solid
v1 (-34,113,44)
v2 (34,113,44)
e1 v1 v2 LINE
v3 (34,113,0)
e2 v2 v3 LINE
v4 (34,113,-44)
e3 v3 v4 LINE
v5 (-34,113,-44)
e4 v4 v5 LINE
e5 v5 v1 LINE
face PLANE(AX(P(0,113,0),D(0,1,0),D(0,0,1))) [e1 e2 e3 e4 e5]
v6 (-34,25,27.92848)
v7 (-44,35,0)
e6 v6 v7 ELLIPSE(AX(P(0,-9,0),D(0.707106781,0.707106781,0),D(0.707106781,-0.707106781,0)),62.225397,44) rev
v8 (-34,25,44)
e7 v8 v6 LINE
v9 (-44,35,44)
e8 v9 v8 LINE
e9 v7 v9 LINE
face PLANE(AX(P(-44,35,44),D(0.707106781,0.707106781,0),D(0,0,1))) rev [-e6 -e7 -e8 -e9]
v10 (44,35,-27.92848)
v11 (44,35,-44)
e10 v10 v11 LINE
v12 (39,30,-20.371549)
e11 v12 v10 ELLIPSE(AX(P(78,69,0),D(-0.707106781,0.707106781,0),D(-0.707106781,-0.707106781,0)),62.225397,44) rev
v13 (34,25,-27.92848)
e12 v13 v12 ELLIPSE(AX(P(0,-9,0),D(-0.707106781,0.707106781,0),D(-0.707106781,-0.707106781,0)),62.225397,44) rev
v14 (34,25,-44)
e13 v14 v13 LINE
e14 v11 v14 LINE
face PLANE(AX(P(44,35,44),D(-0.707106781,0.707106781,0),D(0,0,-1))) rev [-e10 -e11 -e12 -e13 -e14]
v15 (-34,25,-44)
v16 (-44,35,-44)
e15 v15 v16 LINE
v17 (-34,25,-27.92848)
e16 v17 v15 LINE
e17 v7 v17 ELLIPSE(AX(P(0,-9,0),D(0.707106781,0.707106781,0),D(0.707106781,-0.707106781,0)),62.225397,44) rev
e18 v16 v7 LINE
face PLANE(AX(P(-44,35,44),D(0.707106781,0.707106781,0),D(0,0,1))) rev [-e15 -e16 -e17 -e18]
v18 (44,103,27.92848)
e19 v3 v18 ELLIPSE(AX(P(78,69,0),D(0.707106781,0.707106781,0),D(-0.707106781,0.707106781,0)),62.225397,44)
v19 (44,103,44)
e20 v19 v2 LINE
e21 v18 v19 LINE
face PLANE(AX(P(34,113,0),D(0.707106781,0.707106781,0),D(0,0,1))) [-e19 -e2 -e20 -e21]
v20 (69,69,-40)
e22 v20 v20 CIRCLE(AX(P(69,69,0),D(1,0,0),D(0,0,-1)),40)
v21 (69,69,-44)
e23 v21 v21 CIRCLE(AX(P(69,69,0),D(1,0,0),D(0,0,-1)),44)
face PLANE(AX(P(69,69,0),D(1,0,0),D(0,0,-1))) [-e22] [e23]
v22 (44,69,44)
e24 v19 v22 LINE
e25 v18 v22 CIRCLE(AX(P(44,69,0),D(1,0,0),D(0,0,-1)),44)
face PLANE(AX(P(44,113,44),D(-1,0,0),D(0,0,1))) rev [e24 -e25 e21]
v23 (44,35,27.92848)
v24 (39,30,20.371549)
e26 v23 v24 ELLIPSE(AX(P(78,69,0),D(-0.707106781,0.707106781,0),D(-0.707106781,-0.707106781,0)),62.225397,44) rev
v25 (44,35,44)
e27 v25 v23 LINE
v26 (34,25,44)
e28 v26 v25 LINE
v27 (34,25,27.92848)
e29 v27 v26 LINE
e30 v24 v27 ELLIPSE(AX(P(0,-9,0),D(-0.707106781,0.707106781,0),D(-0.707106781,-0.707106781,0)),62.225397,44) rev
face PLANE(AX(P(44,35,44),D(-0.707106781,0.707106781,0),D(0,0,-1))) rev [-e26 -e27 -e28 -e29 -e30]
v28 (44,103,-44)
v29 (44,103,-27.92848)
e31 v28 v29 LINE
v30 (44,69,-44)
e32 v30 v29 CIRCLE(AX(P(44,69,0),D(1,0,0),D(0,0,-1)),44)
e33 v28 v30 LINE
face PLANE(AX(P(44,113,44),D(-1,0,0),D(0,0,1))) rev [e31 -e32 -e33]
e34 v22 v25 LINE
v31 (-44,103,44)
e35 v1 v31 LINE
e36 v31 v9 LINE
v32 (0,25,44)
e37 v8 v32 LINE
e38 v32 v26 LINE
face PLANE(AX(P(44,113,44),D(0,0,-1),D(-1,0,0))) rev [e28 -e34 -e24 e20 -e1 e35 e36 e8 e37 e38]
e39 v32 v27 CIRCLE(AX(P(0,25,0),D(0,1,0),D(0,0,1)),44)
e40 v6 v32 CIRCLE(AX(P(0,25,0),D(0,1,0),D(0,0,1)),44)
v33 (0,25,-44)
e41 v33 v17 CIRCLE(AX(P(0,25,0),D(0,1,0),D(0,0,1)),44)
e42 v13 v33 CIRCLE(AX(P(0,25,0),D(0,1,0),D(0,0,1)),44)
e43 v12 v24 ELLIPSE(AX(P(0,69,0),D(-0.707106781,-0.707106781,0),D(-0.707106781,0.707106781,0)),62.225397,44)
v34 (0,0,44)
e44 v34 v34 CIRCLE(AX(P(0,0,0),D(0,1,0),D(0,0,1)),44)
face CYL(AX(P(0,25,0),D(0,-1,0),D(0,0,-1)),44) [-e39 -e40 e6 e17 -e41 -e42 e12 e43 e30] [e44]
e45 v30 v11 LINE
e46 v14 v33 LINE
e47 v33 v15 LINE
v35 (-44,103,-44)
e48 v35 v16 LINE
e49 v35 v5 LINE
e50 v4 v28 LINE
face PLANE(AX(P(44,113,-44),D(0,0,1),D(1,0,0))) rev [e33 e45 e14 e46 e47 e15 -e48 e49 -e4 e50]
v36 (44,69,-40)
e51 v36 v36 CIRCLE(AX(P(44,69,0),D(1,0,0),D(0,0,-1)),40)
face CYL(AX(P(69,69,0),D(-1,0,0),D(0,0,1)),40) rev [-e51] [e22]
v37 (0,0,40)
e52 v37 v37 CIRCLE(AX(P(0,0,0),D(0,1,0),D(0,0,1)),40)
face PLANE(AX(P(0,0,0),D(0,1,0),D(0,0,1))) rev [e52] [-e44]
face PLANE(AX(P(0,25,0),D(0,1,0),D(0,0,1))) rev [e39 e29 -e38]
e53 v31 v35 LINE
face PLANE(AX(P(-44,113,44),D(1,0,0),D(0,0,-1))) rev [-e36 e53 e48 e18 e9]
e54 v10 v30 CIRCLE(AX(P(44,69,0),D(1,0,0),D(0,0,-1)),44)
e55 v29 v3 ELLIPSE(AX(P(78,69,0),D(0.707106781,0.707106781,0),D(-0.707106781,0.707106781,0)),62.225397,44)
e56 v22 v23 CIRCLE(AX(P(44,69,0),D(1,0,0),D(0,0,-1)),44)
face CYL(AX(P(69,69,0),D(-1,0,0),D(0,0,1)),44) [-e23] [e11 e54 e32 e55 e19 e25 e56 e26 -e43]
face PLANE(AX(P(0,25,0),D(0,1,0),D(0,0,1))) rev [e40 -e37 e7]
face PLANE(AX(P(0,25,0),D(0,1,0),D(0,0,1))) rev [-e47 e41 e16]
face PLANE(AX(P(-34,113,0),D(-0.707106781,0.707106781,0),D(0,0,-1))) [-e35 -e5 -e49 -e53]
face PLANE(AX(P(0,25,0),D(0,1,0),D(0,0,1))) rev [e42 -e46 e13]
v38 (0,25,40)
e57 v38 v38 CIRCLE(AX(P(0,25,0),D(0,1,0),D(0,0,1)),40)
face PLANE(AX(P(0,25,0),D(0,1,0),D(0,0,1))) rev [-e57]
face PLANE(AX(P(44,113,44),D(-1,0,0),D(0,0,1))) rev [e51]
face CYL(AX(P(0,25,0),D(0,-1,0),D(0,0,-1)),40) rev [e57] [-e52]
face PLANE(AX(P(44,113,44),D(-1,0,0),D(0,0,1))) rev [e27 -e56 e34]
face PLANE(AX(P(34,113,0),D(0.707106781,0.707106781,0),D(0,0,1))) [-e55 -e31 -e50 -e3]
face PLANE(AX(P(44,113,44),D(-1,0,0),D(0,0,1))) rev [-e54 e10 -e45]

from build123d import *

# Parameters (mm, degrees)
SKETCH1_R           = 44
SKETCH1_R_2         = 40
BOSS_EXTRUDE1_DEPTH = 25
SKETCH2_R           = 44
SKETCH2_R_2         = 40
BOSS_EXTRUDE2_DEPTH = 25
SKETCH3_W           = 88
SKETCH3_H           = 88
BOSS_EXTRUDE3_DEPTH = 88
CHAMFER2_SIZE       = 10


with BuildPart() as part:
    # Sketch1 → Boss-Extrude1 (new body)
    with BuildSketch(Plane(origin=(0, 0, 0), x_dir=(1, 0, 0), z_dir=(0, 1, 0))):
        with Locations(Location((0, 0, 0), (0, 0, 270))):
            Circle(SKETCH1_R)
        with Locations(Location((0, 0, 0), (0, 0, 270))):
            Circle(SKETCH1_R_2, mode=Mode.SUBTRACT)
    extrude(amount=BOSS_EXTRUDE1_DEPTH)



with BuildPart() as body_2:
    # Sketch2 → Boss-Extrude2 (new body)
    with BuildSketch(Plane(origin=(44, 0, 0), x_dir=(0, 0, -1), z_dir=(1, 0, 0))):
        with Locations((0, 69)):
            Circle(SKETCH2_R)
        with Locations((0, 69)):
            Circle(SKETCH2_R_2, mode=Mode.SUBTRACT)
    extrude(amount=BOSS_EXTRUDE2_DEPTH)


with BuildPart() as part_1:
    add(part.part)

    add(body_2.part)  # Boss-Extrude3 merges body 2
    # Sketch3 → Boss-Extrude3 (add)
    with BuildSketch(Plane(origin=(0, 25, 0), x_dir=(1, 0, 0), z_dir=(0, 1, 0))):
        Rectangle(SKETCH3_W, SKETCH3_H)
    extrude(amount=BOSS_EXTRUDE3_DEPTH)

    # Chamfer2
    # the kernel refuses this chamfer: 10 mm, written as the material it takes off along each edge
    with BuildSketch(Plane(origin=(-44, 25, 8.9e-08), x_dir=(0.9996219169112968, -0.027495876610586317, 0), z_dir=(0, 0, -1))) as chamfer2_piece_1_section:
        Polygon((CHAMFER2_SIZE * 0.999621916911, -CHAMFER2_SIZE * 0.0274958766106), (-CHAMFER2_SIZE * 0.0274958766106, -CHAMFER2_SIZE * 0.999621916911), (0, 0), align=None)
    chamfer2_piece_1 = extrude(amount=69.716829969, mode=Mode.PRIVATE)
    chamfer2_piece_1 = chamfer2_piece_1 - Plane(origin=(0, 28.58171052, 0), x_dir=(0, 0, 1), z_dir=(0, -1, 0)) * Cylinder(44, 180, mode=Mode.PRIVATE)
    add(chamfer2_piece_1, mode=Mode.SUBTRACT)
    with BuildSketch(Plane(origin=(-44, 25, 69.71682988), x_dir=(0.9996219169112968, -0.027495876610586317, 0), z_dir=(0, 0, -1))) as chamfer2_piece_2_section:
        Polygon((CHAMFER2_SIZE * 0.999621916911, -CHAMFER2_SIZE * 0.0274958766106), (-CHAMFER2_SIZE * 0.0274958766106, -CHAMFER2_SIZE * 0.999621916911), (0, 0), align=None)
    chamfer2_piece_2 = extrude(amount=69.716829791, mode=Mode.PRIVATE)
    chamfer2_piece_2 = chamfer2_piece_2 - Plane(origin=(0, 28.58171052, 0), x_dir=(0, 0, 1), z_dir=(0, -1, 0)) * Cylinder(44, 180, mode=Mode.PRIVATE)
    add(chamfer2_piece_2, mode=Mode.SUBTRACT)
    with BuildSketch(Plane(origin=(44, 25, -1.49e-07), x_dir=(-0.9996219169112968, -0.027495876610586317, 0), z_dir=(0, 0, 1))) as chamfer2_piece_3_section:
        Polygon((CHAMFER2_SIZE * 0.999621916911, -CHAMFER2_SIZE * 0.0274958766106), (-CHAMFER2_SIZE * 0.0274958766106, -CHAMFER2_SIZE * 0.999621916911), (0, 0), align=None)
    chamfer2_piece_3 = extrude(amount=69.716830028, mode=Mode.PRIVATE)
    chamfer2_piece_3 = chamfer2_piece_3 - Plane(origin=(0, 28.146935755, 0), x_dir=(0, 0, 1), z_dir=(0, -1, 0)) * Cylinder(44, 180, mode=Mode.PRIVATE)
    chamfer2_piece_3 = chamfer2_piece_3 - Plane(origin=(40.853064245, 69, 0), x_dir=(0, 0, -1), z_dir=(-1, 0, 0)) * Cylinder(44, 180, mode=Mode.PRIVATE)
    add(chamfer2_piece_3, mode=Mode.SUBTRACT)
    with BuildSketch(Plane(origin=(44, 25, -69.71682988), x_dir=(-0.9996219169112968, -0.027495876610586317, 0), z_dir=(0, 0, 1))) as chamfer2_piece_4_section:
        Polygon((CHAMFER2_SIZE * 0.999621916911, -CHAMFER2_SIZE * 0.0274958766106), (-CHAMFER2_SIZE * 0.0274958766106, -CHAMFER2_SIZE * 0.999621916911), (0, 0), align=None)
    chamfer2_piece_4 = extrude(amount=69.716829731, mode=Mode.PRIVATE)
    chamfer2_piece_4 = chamfer2_piece_4 - Plane(origin=(0, 28.146935758, 0), x_dir=(0, 0, 1), z_dir=(0, -1, 0)) * Cylinder(44, 180, mode=Mode.PRIVATE)
    chamfer2_piece_4 = chamfer2_piece_4 - Plane(origin=(40.853064242, 69, 0), x_dir=(0, 0, -1), z_dir=(-1, 0, 0)) * Cylinder(44, 180, mode=Mode.PRIVATE)
    add(chamfer2_piece_4, mode=Mode.SUBTRACT)
    with BuildSketch(Plane(origin=(-44, 113, 69.71682988), x_dir=(-0.027495876610586317, -0.9996219169112968, 0), z_dir=(0, 0, -1))) as chamfer2_piece_5:
        Polygon((CHAMFER2_SIZE * 0.999621916911, -CHAMFER2_SIZE * 0.0274958766106), (-CHAMFER2_SIZE * 0.0274958766106, -CHAMFER2_SIZE * 0.999621916911), (0, 0), align=None)
    extrude(amount=139.433659759, mode=Mode.SUBTRACT)
    with BuildSketch(Plane(origin=(44, 113, -1.44e-07), x_dir=(-0.9996219169112968, 0.027495876610586317, 0), z_dir=(0, 0, 1))) as chamfer2_piece_6_section:
        Polygon((CHAMFER2_SIZE * 0.999621916911, CHAMFER2_SIZE * 0.0274958766106), (-CHAMFER2_SIZE * 0.0274958766106, CHAMFER2_SIZE * 0.999621916911), (0, 0), align=None)
    chamfer2_piece_6 = extrude(amount=69.716830024, mode=Mode.PRIVATE)
    chamfer2_piece_6 = chamfer2_piece_6 - Plane(origin=(40.41828948, 69, 0), x_dir=(0, 0, -1), z_dir=(-1, 0, 0)) * Cylinder(44, 180, mode=Mode.PRIVATE)
    add(chamfer2_piece_6, mode=Mode.SUBTRACT)
    with BuildSketch(Plane(origin=(44, 113, -69.71682988), x_dir=(-0.9996219169112968, 0.027495876610586317, 0), z_dir=(0, 0, 1))) as chamfer2_piece_7_section:
        Polygon((CHAMFER2_SIZE * 0.999621916911, CHAMFER2_SIZE * 0.0274958766106), (-CHAMFER2_SIZE * 0.0274958766106, CHAMFER2_SIZE * 0.999621916911), (0, 0), align=None)
    chamfer2_piece_7 = extrude(amount=69.716829736, mode=Mode.PRIVATE)
    chamfer2_piece_7 = chamfer2_piece_7 - Plane(origin=(40.41828948, 69, 0), x_dir=(0, 0, -1), z_dir=(-1, 0, 0)) * Cylinder(44, 180, mode=Mode.PRIVATE)
    add(chamfer2_piece_7, mode=Mode.SUBTRACT)


solid = part_1.part
